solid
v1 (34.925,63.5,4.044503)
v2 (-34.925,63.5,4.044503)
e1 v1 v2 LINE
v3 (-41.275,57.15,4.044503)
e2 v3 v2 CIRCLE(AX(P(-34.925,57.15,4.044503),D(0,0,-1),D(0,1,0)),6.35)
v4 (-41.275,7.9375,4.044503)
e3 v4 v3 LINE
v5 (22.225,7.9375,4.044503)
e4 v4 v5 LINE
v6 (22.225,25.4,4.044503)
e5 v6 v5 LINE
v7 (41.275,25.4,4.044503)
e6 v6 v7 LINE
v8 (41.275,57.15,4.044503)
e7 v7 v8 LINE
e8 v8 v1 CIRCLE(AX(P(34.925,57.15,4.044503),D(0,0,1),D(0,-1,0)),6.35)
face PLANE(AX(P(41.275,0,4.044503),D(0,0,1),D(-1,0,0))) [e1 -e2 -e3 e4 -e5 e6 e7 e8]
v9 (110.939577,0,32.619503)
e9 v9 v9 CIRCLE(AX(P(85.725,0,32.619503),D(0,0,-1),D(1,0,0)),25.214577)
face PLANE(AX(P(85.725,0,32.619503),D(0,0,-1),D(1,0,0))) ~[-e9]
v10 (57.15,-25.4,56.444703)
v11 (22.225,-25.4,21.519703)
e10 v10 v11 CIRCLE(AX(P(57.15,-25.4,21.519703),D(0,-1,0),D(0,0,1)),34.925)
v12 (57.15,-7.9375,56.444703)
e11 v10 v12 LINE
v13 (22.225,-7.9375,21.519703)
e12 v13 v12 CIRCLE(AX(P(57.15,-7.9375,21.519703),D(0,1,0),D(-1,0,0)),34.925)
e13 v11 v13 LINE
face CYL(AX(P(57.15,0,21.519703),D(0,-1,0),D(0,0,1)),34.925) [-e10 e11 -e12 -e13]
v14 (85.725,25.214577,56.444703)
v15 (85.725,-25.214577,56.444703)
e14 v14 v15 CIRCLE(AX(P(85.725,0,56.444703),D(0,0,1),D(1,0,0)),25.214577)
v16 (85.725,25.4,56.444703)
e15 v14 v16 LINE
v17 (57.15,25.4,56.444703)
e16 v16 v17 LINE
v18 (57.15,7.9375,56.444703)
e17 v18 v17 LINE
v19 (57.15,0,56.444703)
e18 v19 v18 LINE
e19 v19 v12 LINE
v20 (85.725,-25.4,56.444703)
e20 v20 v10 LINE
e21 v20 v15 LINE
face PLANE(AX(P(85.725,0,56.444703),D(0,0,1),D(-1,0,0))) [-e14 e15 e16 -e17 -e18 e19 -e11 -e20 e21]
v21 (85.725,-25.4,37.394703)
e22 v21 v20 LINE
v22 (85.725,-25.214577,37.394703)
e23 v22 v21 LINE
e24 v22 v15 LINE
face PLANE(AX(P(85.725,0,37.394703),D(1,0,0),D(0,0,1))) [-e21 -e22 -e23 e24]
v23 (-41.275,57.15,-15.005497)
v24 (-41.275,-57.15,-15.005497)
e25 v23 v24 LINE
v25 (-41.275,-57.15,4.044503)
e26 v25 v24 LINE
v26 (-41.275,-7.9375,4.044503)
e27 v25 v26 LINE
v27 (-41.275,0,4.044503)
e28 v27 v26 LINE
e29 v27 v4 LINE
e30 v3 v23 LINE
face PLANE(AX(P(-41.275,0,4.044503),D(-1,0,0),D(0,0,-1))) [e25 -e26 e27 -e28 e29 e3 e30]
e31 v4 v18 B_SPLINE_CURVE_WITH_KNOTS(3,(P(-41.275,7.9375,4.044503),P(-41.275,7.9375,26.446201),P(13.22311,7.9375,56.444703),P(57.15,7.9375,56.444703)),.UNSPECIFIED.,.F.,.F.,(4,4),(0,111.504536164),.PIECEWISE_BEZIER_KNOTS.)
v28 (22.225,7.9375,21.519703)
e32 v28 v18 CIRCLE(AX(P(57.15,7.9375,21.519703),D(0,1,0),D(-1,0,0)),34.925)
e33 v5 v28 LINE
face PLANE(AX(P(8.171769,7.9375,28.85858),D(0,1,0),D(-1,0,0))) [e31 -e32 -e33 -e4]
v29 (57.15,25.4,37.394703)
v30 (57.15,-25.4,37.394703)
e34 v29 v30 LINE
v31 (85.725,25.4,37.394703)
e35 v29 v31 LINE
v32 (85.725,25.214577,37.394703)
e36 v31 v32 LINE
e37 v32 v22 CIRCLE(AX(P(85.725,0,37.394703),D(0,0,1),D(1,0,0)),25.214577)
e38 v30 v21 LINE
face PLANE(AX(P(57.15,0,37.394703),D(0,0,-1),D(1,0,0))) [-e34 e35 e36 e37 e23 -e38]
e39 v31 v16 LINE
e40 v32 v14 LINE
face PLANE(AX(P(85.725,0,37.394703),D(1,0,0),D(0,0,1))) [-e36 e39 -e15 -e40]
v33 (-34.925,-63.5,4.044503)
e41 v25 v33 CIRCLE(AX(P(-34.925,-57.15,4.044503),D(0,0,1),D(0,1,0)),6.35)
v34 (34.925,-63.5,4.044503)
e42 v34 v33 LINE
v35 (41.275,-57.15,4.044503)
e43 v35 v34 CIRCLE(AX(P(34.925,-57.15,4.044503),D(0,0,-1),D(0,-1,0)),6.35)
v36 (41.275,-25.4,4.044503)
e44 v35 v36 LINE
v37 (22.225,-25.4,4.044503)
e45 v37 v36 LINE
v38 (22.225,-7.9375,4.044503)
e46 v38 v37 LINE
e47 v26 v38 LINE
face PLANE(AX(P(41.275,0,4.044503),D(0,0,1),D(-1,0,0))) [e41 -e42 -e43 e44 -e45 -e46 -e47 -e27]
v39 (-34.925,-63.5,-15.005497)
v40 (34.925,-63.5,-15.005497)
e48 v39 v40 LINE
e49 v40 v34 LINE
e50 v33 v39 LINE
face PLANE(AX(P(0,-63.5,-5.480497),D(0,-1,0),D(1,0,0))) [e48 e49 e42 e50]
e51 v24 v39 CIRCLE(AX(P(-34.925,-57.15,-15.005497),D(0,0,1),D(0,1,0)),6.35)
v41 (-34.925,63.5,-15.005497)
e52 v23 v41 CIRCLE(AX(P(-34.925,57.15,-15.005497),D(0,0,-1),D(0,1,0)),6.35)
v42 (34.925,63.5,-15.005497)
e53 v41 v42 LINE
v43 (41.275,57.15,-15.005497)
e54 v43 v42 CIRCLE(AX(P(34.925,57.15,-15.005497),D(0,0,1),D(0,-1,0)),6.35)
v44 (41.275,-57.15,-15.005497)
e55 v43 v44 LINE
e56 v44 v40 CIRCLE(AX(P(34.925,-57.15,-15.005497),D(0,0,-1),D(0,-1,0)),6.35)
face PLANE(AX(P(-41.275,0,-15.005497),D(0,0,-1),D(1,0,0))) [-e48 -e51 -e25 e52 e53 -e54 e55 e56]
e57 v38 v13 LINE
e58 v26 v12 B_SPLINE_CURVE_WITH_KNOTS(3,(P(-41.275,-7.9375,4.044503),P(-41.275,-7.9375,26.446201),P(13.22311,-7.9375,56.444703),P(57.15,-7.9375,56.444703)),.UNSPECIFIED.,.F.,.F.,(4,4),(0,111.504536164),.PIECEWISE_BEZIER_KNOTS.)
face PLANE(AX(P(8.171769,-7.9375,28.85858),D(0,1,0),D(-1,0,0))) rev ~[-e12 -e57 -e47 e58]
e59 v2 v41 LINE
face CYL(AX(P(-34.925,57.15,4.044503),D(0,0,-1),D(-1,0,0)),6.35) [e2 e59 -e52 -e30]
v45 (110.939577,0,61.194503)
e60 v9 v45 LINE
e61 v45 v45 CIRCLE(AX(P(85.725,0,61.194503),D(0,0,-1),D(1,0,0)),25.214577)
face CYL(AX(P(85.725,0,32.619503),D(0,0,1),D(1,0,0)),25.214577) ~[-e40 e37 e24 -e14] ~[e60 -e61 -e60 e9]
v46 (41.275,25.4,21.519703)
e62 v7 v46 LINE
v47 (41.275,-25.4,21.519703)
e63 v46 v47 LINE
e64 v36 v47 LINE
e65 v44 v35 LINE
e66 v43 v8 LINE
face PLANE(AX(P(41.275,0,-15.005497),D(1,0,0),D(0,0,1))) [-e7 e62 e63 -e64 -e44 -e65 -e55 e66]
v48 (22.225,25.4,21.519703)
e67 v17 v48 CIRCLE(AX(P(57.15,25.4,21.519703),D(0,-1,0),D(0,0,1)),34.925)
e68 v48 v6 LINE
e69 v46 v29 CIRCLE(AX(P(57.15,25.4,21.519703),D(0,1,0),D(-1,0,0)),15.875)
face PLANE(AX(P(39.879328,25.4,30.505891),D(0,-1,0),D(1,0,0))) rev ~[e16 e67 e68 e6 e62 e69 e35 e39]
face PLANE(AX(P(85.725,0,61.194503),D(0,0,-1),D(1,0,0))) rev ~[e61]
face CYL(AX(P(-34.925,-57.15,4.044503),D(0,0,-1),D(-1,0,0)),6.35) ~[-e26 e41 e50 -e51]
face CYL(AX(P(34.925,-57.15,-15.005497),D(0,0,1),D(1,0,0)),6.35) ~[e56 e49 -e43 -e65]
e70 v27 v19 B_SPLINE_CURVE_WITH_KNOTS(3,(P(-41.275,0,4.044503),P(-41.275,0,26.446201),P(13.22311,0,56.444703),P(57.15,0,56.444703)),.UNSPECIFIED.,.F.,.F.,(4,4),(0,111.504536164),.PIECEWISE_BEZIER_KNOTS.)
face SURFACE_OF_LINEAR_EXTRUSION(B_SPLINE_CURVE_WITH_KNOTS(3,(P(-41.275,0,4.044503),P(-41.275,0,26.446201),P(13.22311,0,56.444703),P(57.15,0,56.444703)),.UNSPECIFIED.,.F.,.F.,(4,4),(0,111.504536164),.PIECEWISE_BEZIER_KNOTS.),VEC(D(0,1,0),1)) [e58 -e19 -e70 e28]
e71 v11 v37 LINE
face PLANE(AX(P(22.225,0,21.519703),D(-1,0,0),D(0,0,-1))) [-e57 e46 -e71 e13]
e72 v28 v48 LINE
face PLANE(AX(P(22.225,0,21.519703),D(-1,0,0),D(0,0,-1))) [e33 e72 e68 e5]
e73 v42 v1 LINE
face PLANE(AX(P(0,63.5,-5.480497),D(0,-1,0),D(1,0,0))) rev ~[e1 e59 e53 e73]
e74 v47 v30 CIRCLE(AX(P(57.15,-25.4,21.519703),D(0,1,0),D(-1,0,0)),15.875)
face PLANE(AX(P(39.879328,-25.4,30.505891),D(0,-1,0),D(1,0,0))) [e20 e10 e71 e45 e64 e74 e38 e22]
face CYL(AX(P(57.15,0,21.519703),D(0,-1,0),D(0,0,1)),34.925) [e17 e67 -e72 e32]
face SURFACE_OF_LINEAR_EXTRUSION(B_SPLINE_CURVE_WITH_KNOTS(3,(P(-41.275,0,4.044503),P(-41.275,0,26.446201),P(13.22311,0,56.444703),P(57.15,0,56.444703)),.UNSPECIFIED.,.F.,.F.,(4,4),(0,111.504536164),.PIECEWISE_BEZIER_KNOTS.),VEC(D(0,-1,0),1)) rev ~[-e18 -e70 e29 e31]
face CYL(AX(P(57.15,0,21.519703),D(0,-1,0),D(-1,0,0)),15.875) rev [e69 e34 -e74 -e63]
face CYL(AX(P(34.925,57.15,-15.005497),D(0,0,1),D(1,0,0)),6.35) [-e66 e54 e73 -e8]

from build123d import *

# Parameters (mm, degrees)
F1_DEPTH = 63.5
F0_W     = 25.5854227781
F0_H     = 19.05
F2_DEPTH = 25.4
F3_DEPTH = 7.9375
F5_R     = 6.35


# Not quite as in the source:
# - a feature names something its author has since deleted; it is built from what else it names


with BuildPart() as f1:
    # F0 (on Front) → F1 (new body, symmetric)
    with BuildSketch(Plane.XZ):
        Polygon((22.225, 4.044502968), (-41.275, 4.044502968), (-41.275, -15.005497032), (41.275, -15.005497032), (41.275, 4.044502968), align=None)
    extrude(amount=F1_DEPTH, both=True)

    # F0 (on Front) → F2 (join, symmetric)
    with BuildSketch(Plane.XZ):
        with BuildLine():
            Line((22.225, 21.519702968), (22.225, 4.044502968))
            Line((22.225, 4.044502968), (41.275, 4.044502968))
            Line((41.275, 4.044502968), (41.275, 21.519702968))
            ThreePointArc((41.275, 21.519702968), (45.9246798487, 32.7450231193), (57.15, 37.394702968))
            Line((57.15, 37.394702968), (60.1395772219, 37.394702968))
            Line((60.1395772219, 37.394702968), (60.1395772219, 56.444702968))
            Line((60.1395772219, 56.444702968), (57.15, 56.444702968))
            ThreePointArc((57.15, 56.444702968), (32.4542956671, 46.2154073009), (22.225, 21.519702968))
        make_face()
        with Locations((72.9322886109, 46.919702968)):
            Rectangle(F0_W, F0_H)
    extrude(amount=F2_DEPTH, both=True)

    # F0 (on Front) → F3 (join, symmetric)
    with BuildSketch(Plane.XZ):
        with BuildLine():
            add(Edge.make_bspline(
                [(-41.275, 4.044502968), (-41.275, 26.4462009072), (13.2231097668, 56.444702968), (57.15, 56.444702968)],
                knots=[0, 0, 0, 0, 111.5045361635, 111.5045361635, 111.5045361635, 111.5045361635], degree=3))
            Line((-41.275, 4.044502968), (22.225, 4.044502968))
            Line((22.225, 4.044502968), (22.225, 21.519702968))
            ThreePointArc((22.225, 21.519702968), (32.4542956671, 46.2154073009), (57.15, 56.444702968))
        make_face()
    extrude(amount=F3_DEPTH, both=True)

    # F0 (on Front) → F4 (revolve)
    with BuildSketch(Plane.XZ):
        Polygon((85.725, 61.194502968), (85.725, 56.444702968), (85.725, 37.394702968), (85.725, 32.619502968), (110.9395772219, 32.619502968), (110.9395772219, 61.194502968), align=None)
    revolve(axis=Axis((85.725, 0, 46.907002968), (0, 0, -1)))

    # F5
    f5_edges = [f1.edges().sort_by_distance(p)[0] for p in [
        (-41.275, -63.5, -5.480497),
        (41.275, -63.5, -5.480497),
        (41.275, 63.5, -5.480497),
        (-41.275, 63.5, -5.480497),
    ]]
    fillet(f5_edges, radius=F5_R)


solid = f1.part
